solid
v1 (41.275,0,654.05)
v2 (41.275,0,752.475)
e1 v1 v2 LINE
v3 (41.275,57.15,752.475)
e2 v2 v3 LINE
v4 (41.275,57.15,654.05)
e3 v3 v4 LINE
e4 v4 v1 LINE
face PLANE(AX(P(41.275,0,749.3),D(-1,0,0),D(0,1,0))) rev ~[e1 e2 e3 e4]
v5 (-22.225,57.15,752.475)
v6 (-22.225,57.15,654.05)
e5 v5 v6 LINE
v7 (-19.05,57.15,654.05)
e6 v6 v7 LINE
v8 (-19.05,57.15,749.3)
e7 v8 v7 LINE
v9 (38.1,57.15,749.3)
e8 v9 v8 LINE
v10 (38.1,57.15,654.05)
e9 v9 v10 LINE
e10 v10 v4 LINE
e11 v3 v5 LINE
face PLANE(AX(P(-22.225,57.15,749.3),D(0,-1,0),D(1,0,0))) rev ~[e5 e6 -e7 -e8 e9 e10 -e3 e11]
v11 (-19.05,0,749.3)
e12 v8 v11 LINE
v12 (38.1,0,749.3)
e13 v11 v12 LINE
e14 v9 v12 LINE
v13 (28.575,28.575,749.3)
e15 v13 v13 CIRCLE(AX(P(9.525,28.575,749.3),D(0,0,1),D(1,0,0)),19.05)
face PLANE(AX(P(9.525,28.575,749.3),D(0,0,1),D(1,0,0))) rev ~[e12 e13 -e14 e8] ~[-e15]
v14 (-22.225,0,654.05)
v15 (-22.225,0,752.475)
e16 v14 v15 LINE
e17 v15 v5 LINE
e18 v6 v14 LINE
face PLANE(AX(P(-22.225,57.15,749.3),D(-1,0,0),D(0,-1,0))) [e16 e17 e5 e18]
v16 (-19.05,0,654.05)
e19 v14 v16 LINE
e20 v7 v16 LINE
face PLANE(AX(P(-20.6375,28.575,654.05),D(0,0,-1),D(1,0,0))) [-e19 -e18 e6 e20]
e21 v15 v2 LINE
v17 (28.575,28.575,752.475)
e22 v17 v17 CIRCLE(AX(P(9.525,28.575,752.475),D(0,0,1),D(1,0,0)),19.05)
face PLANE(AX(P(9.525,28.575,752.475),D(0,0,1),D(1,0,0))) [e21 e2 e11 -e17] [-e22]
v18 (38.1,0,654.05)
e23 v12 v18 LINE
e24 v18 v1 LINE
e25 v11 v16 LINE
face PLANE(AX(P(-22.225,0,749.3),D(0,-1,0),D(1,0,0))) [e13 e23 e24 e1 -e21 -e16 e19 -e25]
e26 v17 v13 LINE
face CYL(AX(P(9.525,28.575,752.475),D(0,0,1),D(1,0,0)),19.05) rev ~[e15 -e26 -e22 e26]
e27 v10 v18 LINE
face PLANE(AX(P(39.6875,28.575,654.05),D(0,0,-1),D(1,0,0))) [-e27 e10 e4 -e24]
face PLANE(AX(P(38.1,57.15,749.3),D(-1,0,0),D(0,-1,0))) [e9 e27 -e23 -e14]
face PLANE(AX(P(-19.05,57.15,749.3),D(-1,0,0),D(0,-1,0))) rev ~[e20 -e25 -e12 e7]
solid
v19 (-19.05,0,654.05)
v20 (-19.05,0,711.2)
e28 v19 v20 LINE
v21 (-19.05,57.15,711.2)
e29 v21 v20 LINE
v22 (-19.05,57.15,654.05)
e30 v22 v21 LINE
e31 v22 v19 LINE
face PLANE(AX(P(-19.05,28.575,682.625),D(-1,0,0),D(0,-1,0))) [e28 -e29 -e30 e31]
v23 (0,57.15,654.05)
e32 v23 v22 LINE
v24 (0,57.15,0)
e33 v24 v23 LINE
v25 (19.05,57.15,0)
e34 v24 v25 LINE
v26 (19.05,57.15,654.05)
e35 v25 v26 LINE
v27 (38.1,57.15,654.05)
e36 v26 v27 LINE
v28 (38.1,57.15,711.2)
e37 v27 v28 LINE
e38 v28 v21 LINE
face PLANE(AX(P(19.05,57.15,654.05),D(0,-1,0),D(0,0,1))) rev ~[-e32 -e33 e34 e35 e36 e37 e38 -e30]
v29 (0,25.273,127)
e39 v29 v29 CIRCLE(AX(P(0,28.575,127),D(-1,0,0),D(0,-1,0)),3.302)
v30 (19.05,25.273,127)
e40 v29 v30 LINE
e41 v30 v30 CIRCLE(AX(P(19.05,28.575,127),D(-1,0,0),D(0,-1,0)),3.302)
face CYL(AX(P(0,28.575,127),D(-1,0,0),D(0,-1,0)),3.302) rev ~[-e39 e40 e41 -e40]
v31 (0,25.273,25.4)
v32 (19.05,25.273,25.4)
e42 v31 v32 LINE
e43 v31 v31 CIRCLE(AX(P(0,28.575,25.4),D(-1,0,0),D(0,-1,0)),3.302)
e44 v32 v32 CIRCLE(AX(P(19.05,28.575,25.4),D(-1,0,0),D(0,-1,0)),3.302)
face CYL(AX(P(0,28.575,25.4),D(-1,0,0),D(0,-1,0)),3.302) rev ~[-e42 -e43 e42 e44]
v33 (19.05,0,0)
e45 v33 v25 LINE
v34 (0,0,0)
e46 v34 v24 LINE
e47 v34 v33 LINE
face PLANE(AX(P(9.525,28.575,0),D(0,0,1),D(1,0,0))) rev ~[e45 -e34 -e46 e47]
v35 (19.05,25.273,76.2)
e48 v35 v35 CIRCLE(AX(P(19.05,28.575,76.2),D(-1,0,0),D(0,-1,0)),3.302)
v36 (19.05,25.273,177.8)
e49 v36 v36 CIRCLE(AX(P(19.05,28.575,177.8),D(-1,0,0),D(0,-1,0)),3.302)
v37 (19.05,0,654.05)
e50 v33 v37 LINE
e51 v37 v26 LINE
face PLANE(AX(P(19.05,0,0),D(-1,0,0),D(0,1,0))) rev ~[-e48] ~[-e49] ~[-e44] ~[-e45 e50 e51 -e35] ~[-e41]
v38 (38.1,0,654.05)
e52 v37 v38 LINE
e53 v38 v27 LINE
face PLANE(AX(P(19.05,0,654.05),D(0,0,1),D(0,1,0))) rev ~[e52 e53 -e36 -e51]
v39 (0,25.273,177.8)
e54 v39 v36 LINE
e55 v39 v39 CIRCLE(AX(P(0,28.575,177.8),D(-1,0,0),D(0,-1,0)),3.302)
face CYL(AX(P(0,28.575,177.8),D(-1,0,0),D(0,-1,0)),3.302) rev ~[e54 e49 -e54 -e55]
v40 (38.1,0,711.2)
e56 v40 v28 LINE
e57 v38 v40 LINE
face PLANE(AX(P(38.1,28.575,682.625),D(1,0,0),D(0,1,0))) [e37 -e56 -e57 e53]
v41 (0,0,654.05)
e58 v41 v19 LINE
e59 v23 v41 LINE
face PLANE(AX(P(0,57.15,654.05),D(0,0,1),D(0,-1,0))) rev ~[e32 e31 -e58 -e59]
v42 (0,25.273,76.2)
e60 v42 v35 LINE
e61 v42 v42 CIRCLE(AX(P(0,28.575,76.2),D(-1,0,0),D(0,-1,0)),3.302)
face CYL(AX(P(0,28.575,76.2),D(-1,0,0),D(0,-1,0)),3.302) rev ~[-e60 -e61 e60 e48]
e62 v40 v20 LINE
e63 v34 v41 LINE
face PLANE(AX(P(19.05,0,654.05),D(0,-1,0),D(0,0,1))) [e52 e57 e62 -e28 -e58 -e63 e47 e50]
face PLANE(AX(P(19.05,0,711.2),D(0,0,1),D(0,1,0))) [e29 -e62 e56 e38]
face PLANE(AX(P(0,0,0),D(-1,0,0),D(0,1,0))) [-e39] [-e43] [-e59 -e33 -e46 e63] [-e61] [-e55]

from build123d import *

# Parameters (mm, degrees)
F0_W      = 19.05
F0_H      = 57.15
F1_DEPTH  = 711.2
F2_W      = 57.15
F2_H      = 57.15
F3_DEPTH  = 19.05
F4_W      = 57.15
F4_H      = 57.15
F5_DEPTH  = 19.05
F7_W      = 57.15
F7_H      = 57.15
F7_W_2    = 3.175
F8_DEPTH  = 3.175
F9_W      = 3.175
F9_H      = 57.15
F10_DEPTH = 95.25
F11_R     = 19.05
F12_DEPTH = 3.175
F13_R     = 3.302
F14_DEPTH = 19.05


with BuildPart() as f1:
    # F0 (on Top) → F1 (new body)
    with BuildSketch(Plane.XY):
        with Locations((9.525, 28.575)):
            Rectangle(F0_W, F0_H)
    extrude(amount=F1_DEPTH)

    # F2 (on face) → F3 (join)
    with BuildSketch(Plane(origin=(0, 0, 0), x_dir=(0, -1, 0), z_dir=(-1, 0, 0))):
        with Locations((-28.575, 682.625)):
            Rectangle(F2_W, F2_H)
    extrude(amount=F3_DEPTH)

    # F4 (on face) → F5 (join)
    with BuildSketch(Plane.YZ.offset(19.05)):
        with Locations((28.575, 682.625)):
            Rectangle(F4_W, F4_H)
    extrude(amount=F5_DEPTH)

    # F13 (on face) → F14 (cut, through all)
    with BuildSketch(Plane(origin=(0, 0, 0), x_dir=(0, -1, 0), z_dir=(-1, 0, 0))):
        with Locations((-28.575, 25.4)):
            Circle(F13_R)
        with Locations((-28.575, 76.2)):
            Circle(F13_R)
        with Locations((-28.575, 127)):
            Circle(F13_R)
        with Locations((-28.575, 177.8)):
            Circle(F13_R)
    extrude(amount=-F14_DEPTH, mode=Mode.SUBTRACT)


with BuildPart() as f8:
    # F7 (on offset) → F8 (new body)
    with BuildSketch(Plane.XY.offset(749.3)):
        with Locations((9.525, 28.575)):
            Rectangle(F7_W, F7_H)
        with Locations((39.6875, 28.575)):
            Rectangle(F7_W_2, F7_H)
        with Locations((-20.6375, 28.575)):
            Rectangle(F7_W_2, F7_H)
    extrude(amount=F8_DEPTH)

    # F9 (on face) → F10 (join, through all)
    with BuildSketch(Plane(origin=(0, 0, 749.3), x_dir=(1, 0, 0), z_dir=(0, 0, -1))):
        with Locations((-20.6375, -28.575)):
            Rectangle(F9_W, F9_H)
        with Locations((39.6875, -28.575)):
            Rectangle(F9_W, F9_H)
    extrude(amount=F10_DEPTH)

    # F11 (on face) → F12 (cut, through all)
    with BuildSketch(Plane.XY.offset(752.475)):
        with Locations((9.525, 28.575)):
            Circle(F11_R)
    extrude(amount=-F12_DEPTH, mode=Mode.SUBTRACT)


solid = Compound([f1.part, f8.part])
